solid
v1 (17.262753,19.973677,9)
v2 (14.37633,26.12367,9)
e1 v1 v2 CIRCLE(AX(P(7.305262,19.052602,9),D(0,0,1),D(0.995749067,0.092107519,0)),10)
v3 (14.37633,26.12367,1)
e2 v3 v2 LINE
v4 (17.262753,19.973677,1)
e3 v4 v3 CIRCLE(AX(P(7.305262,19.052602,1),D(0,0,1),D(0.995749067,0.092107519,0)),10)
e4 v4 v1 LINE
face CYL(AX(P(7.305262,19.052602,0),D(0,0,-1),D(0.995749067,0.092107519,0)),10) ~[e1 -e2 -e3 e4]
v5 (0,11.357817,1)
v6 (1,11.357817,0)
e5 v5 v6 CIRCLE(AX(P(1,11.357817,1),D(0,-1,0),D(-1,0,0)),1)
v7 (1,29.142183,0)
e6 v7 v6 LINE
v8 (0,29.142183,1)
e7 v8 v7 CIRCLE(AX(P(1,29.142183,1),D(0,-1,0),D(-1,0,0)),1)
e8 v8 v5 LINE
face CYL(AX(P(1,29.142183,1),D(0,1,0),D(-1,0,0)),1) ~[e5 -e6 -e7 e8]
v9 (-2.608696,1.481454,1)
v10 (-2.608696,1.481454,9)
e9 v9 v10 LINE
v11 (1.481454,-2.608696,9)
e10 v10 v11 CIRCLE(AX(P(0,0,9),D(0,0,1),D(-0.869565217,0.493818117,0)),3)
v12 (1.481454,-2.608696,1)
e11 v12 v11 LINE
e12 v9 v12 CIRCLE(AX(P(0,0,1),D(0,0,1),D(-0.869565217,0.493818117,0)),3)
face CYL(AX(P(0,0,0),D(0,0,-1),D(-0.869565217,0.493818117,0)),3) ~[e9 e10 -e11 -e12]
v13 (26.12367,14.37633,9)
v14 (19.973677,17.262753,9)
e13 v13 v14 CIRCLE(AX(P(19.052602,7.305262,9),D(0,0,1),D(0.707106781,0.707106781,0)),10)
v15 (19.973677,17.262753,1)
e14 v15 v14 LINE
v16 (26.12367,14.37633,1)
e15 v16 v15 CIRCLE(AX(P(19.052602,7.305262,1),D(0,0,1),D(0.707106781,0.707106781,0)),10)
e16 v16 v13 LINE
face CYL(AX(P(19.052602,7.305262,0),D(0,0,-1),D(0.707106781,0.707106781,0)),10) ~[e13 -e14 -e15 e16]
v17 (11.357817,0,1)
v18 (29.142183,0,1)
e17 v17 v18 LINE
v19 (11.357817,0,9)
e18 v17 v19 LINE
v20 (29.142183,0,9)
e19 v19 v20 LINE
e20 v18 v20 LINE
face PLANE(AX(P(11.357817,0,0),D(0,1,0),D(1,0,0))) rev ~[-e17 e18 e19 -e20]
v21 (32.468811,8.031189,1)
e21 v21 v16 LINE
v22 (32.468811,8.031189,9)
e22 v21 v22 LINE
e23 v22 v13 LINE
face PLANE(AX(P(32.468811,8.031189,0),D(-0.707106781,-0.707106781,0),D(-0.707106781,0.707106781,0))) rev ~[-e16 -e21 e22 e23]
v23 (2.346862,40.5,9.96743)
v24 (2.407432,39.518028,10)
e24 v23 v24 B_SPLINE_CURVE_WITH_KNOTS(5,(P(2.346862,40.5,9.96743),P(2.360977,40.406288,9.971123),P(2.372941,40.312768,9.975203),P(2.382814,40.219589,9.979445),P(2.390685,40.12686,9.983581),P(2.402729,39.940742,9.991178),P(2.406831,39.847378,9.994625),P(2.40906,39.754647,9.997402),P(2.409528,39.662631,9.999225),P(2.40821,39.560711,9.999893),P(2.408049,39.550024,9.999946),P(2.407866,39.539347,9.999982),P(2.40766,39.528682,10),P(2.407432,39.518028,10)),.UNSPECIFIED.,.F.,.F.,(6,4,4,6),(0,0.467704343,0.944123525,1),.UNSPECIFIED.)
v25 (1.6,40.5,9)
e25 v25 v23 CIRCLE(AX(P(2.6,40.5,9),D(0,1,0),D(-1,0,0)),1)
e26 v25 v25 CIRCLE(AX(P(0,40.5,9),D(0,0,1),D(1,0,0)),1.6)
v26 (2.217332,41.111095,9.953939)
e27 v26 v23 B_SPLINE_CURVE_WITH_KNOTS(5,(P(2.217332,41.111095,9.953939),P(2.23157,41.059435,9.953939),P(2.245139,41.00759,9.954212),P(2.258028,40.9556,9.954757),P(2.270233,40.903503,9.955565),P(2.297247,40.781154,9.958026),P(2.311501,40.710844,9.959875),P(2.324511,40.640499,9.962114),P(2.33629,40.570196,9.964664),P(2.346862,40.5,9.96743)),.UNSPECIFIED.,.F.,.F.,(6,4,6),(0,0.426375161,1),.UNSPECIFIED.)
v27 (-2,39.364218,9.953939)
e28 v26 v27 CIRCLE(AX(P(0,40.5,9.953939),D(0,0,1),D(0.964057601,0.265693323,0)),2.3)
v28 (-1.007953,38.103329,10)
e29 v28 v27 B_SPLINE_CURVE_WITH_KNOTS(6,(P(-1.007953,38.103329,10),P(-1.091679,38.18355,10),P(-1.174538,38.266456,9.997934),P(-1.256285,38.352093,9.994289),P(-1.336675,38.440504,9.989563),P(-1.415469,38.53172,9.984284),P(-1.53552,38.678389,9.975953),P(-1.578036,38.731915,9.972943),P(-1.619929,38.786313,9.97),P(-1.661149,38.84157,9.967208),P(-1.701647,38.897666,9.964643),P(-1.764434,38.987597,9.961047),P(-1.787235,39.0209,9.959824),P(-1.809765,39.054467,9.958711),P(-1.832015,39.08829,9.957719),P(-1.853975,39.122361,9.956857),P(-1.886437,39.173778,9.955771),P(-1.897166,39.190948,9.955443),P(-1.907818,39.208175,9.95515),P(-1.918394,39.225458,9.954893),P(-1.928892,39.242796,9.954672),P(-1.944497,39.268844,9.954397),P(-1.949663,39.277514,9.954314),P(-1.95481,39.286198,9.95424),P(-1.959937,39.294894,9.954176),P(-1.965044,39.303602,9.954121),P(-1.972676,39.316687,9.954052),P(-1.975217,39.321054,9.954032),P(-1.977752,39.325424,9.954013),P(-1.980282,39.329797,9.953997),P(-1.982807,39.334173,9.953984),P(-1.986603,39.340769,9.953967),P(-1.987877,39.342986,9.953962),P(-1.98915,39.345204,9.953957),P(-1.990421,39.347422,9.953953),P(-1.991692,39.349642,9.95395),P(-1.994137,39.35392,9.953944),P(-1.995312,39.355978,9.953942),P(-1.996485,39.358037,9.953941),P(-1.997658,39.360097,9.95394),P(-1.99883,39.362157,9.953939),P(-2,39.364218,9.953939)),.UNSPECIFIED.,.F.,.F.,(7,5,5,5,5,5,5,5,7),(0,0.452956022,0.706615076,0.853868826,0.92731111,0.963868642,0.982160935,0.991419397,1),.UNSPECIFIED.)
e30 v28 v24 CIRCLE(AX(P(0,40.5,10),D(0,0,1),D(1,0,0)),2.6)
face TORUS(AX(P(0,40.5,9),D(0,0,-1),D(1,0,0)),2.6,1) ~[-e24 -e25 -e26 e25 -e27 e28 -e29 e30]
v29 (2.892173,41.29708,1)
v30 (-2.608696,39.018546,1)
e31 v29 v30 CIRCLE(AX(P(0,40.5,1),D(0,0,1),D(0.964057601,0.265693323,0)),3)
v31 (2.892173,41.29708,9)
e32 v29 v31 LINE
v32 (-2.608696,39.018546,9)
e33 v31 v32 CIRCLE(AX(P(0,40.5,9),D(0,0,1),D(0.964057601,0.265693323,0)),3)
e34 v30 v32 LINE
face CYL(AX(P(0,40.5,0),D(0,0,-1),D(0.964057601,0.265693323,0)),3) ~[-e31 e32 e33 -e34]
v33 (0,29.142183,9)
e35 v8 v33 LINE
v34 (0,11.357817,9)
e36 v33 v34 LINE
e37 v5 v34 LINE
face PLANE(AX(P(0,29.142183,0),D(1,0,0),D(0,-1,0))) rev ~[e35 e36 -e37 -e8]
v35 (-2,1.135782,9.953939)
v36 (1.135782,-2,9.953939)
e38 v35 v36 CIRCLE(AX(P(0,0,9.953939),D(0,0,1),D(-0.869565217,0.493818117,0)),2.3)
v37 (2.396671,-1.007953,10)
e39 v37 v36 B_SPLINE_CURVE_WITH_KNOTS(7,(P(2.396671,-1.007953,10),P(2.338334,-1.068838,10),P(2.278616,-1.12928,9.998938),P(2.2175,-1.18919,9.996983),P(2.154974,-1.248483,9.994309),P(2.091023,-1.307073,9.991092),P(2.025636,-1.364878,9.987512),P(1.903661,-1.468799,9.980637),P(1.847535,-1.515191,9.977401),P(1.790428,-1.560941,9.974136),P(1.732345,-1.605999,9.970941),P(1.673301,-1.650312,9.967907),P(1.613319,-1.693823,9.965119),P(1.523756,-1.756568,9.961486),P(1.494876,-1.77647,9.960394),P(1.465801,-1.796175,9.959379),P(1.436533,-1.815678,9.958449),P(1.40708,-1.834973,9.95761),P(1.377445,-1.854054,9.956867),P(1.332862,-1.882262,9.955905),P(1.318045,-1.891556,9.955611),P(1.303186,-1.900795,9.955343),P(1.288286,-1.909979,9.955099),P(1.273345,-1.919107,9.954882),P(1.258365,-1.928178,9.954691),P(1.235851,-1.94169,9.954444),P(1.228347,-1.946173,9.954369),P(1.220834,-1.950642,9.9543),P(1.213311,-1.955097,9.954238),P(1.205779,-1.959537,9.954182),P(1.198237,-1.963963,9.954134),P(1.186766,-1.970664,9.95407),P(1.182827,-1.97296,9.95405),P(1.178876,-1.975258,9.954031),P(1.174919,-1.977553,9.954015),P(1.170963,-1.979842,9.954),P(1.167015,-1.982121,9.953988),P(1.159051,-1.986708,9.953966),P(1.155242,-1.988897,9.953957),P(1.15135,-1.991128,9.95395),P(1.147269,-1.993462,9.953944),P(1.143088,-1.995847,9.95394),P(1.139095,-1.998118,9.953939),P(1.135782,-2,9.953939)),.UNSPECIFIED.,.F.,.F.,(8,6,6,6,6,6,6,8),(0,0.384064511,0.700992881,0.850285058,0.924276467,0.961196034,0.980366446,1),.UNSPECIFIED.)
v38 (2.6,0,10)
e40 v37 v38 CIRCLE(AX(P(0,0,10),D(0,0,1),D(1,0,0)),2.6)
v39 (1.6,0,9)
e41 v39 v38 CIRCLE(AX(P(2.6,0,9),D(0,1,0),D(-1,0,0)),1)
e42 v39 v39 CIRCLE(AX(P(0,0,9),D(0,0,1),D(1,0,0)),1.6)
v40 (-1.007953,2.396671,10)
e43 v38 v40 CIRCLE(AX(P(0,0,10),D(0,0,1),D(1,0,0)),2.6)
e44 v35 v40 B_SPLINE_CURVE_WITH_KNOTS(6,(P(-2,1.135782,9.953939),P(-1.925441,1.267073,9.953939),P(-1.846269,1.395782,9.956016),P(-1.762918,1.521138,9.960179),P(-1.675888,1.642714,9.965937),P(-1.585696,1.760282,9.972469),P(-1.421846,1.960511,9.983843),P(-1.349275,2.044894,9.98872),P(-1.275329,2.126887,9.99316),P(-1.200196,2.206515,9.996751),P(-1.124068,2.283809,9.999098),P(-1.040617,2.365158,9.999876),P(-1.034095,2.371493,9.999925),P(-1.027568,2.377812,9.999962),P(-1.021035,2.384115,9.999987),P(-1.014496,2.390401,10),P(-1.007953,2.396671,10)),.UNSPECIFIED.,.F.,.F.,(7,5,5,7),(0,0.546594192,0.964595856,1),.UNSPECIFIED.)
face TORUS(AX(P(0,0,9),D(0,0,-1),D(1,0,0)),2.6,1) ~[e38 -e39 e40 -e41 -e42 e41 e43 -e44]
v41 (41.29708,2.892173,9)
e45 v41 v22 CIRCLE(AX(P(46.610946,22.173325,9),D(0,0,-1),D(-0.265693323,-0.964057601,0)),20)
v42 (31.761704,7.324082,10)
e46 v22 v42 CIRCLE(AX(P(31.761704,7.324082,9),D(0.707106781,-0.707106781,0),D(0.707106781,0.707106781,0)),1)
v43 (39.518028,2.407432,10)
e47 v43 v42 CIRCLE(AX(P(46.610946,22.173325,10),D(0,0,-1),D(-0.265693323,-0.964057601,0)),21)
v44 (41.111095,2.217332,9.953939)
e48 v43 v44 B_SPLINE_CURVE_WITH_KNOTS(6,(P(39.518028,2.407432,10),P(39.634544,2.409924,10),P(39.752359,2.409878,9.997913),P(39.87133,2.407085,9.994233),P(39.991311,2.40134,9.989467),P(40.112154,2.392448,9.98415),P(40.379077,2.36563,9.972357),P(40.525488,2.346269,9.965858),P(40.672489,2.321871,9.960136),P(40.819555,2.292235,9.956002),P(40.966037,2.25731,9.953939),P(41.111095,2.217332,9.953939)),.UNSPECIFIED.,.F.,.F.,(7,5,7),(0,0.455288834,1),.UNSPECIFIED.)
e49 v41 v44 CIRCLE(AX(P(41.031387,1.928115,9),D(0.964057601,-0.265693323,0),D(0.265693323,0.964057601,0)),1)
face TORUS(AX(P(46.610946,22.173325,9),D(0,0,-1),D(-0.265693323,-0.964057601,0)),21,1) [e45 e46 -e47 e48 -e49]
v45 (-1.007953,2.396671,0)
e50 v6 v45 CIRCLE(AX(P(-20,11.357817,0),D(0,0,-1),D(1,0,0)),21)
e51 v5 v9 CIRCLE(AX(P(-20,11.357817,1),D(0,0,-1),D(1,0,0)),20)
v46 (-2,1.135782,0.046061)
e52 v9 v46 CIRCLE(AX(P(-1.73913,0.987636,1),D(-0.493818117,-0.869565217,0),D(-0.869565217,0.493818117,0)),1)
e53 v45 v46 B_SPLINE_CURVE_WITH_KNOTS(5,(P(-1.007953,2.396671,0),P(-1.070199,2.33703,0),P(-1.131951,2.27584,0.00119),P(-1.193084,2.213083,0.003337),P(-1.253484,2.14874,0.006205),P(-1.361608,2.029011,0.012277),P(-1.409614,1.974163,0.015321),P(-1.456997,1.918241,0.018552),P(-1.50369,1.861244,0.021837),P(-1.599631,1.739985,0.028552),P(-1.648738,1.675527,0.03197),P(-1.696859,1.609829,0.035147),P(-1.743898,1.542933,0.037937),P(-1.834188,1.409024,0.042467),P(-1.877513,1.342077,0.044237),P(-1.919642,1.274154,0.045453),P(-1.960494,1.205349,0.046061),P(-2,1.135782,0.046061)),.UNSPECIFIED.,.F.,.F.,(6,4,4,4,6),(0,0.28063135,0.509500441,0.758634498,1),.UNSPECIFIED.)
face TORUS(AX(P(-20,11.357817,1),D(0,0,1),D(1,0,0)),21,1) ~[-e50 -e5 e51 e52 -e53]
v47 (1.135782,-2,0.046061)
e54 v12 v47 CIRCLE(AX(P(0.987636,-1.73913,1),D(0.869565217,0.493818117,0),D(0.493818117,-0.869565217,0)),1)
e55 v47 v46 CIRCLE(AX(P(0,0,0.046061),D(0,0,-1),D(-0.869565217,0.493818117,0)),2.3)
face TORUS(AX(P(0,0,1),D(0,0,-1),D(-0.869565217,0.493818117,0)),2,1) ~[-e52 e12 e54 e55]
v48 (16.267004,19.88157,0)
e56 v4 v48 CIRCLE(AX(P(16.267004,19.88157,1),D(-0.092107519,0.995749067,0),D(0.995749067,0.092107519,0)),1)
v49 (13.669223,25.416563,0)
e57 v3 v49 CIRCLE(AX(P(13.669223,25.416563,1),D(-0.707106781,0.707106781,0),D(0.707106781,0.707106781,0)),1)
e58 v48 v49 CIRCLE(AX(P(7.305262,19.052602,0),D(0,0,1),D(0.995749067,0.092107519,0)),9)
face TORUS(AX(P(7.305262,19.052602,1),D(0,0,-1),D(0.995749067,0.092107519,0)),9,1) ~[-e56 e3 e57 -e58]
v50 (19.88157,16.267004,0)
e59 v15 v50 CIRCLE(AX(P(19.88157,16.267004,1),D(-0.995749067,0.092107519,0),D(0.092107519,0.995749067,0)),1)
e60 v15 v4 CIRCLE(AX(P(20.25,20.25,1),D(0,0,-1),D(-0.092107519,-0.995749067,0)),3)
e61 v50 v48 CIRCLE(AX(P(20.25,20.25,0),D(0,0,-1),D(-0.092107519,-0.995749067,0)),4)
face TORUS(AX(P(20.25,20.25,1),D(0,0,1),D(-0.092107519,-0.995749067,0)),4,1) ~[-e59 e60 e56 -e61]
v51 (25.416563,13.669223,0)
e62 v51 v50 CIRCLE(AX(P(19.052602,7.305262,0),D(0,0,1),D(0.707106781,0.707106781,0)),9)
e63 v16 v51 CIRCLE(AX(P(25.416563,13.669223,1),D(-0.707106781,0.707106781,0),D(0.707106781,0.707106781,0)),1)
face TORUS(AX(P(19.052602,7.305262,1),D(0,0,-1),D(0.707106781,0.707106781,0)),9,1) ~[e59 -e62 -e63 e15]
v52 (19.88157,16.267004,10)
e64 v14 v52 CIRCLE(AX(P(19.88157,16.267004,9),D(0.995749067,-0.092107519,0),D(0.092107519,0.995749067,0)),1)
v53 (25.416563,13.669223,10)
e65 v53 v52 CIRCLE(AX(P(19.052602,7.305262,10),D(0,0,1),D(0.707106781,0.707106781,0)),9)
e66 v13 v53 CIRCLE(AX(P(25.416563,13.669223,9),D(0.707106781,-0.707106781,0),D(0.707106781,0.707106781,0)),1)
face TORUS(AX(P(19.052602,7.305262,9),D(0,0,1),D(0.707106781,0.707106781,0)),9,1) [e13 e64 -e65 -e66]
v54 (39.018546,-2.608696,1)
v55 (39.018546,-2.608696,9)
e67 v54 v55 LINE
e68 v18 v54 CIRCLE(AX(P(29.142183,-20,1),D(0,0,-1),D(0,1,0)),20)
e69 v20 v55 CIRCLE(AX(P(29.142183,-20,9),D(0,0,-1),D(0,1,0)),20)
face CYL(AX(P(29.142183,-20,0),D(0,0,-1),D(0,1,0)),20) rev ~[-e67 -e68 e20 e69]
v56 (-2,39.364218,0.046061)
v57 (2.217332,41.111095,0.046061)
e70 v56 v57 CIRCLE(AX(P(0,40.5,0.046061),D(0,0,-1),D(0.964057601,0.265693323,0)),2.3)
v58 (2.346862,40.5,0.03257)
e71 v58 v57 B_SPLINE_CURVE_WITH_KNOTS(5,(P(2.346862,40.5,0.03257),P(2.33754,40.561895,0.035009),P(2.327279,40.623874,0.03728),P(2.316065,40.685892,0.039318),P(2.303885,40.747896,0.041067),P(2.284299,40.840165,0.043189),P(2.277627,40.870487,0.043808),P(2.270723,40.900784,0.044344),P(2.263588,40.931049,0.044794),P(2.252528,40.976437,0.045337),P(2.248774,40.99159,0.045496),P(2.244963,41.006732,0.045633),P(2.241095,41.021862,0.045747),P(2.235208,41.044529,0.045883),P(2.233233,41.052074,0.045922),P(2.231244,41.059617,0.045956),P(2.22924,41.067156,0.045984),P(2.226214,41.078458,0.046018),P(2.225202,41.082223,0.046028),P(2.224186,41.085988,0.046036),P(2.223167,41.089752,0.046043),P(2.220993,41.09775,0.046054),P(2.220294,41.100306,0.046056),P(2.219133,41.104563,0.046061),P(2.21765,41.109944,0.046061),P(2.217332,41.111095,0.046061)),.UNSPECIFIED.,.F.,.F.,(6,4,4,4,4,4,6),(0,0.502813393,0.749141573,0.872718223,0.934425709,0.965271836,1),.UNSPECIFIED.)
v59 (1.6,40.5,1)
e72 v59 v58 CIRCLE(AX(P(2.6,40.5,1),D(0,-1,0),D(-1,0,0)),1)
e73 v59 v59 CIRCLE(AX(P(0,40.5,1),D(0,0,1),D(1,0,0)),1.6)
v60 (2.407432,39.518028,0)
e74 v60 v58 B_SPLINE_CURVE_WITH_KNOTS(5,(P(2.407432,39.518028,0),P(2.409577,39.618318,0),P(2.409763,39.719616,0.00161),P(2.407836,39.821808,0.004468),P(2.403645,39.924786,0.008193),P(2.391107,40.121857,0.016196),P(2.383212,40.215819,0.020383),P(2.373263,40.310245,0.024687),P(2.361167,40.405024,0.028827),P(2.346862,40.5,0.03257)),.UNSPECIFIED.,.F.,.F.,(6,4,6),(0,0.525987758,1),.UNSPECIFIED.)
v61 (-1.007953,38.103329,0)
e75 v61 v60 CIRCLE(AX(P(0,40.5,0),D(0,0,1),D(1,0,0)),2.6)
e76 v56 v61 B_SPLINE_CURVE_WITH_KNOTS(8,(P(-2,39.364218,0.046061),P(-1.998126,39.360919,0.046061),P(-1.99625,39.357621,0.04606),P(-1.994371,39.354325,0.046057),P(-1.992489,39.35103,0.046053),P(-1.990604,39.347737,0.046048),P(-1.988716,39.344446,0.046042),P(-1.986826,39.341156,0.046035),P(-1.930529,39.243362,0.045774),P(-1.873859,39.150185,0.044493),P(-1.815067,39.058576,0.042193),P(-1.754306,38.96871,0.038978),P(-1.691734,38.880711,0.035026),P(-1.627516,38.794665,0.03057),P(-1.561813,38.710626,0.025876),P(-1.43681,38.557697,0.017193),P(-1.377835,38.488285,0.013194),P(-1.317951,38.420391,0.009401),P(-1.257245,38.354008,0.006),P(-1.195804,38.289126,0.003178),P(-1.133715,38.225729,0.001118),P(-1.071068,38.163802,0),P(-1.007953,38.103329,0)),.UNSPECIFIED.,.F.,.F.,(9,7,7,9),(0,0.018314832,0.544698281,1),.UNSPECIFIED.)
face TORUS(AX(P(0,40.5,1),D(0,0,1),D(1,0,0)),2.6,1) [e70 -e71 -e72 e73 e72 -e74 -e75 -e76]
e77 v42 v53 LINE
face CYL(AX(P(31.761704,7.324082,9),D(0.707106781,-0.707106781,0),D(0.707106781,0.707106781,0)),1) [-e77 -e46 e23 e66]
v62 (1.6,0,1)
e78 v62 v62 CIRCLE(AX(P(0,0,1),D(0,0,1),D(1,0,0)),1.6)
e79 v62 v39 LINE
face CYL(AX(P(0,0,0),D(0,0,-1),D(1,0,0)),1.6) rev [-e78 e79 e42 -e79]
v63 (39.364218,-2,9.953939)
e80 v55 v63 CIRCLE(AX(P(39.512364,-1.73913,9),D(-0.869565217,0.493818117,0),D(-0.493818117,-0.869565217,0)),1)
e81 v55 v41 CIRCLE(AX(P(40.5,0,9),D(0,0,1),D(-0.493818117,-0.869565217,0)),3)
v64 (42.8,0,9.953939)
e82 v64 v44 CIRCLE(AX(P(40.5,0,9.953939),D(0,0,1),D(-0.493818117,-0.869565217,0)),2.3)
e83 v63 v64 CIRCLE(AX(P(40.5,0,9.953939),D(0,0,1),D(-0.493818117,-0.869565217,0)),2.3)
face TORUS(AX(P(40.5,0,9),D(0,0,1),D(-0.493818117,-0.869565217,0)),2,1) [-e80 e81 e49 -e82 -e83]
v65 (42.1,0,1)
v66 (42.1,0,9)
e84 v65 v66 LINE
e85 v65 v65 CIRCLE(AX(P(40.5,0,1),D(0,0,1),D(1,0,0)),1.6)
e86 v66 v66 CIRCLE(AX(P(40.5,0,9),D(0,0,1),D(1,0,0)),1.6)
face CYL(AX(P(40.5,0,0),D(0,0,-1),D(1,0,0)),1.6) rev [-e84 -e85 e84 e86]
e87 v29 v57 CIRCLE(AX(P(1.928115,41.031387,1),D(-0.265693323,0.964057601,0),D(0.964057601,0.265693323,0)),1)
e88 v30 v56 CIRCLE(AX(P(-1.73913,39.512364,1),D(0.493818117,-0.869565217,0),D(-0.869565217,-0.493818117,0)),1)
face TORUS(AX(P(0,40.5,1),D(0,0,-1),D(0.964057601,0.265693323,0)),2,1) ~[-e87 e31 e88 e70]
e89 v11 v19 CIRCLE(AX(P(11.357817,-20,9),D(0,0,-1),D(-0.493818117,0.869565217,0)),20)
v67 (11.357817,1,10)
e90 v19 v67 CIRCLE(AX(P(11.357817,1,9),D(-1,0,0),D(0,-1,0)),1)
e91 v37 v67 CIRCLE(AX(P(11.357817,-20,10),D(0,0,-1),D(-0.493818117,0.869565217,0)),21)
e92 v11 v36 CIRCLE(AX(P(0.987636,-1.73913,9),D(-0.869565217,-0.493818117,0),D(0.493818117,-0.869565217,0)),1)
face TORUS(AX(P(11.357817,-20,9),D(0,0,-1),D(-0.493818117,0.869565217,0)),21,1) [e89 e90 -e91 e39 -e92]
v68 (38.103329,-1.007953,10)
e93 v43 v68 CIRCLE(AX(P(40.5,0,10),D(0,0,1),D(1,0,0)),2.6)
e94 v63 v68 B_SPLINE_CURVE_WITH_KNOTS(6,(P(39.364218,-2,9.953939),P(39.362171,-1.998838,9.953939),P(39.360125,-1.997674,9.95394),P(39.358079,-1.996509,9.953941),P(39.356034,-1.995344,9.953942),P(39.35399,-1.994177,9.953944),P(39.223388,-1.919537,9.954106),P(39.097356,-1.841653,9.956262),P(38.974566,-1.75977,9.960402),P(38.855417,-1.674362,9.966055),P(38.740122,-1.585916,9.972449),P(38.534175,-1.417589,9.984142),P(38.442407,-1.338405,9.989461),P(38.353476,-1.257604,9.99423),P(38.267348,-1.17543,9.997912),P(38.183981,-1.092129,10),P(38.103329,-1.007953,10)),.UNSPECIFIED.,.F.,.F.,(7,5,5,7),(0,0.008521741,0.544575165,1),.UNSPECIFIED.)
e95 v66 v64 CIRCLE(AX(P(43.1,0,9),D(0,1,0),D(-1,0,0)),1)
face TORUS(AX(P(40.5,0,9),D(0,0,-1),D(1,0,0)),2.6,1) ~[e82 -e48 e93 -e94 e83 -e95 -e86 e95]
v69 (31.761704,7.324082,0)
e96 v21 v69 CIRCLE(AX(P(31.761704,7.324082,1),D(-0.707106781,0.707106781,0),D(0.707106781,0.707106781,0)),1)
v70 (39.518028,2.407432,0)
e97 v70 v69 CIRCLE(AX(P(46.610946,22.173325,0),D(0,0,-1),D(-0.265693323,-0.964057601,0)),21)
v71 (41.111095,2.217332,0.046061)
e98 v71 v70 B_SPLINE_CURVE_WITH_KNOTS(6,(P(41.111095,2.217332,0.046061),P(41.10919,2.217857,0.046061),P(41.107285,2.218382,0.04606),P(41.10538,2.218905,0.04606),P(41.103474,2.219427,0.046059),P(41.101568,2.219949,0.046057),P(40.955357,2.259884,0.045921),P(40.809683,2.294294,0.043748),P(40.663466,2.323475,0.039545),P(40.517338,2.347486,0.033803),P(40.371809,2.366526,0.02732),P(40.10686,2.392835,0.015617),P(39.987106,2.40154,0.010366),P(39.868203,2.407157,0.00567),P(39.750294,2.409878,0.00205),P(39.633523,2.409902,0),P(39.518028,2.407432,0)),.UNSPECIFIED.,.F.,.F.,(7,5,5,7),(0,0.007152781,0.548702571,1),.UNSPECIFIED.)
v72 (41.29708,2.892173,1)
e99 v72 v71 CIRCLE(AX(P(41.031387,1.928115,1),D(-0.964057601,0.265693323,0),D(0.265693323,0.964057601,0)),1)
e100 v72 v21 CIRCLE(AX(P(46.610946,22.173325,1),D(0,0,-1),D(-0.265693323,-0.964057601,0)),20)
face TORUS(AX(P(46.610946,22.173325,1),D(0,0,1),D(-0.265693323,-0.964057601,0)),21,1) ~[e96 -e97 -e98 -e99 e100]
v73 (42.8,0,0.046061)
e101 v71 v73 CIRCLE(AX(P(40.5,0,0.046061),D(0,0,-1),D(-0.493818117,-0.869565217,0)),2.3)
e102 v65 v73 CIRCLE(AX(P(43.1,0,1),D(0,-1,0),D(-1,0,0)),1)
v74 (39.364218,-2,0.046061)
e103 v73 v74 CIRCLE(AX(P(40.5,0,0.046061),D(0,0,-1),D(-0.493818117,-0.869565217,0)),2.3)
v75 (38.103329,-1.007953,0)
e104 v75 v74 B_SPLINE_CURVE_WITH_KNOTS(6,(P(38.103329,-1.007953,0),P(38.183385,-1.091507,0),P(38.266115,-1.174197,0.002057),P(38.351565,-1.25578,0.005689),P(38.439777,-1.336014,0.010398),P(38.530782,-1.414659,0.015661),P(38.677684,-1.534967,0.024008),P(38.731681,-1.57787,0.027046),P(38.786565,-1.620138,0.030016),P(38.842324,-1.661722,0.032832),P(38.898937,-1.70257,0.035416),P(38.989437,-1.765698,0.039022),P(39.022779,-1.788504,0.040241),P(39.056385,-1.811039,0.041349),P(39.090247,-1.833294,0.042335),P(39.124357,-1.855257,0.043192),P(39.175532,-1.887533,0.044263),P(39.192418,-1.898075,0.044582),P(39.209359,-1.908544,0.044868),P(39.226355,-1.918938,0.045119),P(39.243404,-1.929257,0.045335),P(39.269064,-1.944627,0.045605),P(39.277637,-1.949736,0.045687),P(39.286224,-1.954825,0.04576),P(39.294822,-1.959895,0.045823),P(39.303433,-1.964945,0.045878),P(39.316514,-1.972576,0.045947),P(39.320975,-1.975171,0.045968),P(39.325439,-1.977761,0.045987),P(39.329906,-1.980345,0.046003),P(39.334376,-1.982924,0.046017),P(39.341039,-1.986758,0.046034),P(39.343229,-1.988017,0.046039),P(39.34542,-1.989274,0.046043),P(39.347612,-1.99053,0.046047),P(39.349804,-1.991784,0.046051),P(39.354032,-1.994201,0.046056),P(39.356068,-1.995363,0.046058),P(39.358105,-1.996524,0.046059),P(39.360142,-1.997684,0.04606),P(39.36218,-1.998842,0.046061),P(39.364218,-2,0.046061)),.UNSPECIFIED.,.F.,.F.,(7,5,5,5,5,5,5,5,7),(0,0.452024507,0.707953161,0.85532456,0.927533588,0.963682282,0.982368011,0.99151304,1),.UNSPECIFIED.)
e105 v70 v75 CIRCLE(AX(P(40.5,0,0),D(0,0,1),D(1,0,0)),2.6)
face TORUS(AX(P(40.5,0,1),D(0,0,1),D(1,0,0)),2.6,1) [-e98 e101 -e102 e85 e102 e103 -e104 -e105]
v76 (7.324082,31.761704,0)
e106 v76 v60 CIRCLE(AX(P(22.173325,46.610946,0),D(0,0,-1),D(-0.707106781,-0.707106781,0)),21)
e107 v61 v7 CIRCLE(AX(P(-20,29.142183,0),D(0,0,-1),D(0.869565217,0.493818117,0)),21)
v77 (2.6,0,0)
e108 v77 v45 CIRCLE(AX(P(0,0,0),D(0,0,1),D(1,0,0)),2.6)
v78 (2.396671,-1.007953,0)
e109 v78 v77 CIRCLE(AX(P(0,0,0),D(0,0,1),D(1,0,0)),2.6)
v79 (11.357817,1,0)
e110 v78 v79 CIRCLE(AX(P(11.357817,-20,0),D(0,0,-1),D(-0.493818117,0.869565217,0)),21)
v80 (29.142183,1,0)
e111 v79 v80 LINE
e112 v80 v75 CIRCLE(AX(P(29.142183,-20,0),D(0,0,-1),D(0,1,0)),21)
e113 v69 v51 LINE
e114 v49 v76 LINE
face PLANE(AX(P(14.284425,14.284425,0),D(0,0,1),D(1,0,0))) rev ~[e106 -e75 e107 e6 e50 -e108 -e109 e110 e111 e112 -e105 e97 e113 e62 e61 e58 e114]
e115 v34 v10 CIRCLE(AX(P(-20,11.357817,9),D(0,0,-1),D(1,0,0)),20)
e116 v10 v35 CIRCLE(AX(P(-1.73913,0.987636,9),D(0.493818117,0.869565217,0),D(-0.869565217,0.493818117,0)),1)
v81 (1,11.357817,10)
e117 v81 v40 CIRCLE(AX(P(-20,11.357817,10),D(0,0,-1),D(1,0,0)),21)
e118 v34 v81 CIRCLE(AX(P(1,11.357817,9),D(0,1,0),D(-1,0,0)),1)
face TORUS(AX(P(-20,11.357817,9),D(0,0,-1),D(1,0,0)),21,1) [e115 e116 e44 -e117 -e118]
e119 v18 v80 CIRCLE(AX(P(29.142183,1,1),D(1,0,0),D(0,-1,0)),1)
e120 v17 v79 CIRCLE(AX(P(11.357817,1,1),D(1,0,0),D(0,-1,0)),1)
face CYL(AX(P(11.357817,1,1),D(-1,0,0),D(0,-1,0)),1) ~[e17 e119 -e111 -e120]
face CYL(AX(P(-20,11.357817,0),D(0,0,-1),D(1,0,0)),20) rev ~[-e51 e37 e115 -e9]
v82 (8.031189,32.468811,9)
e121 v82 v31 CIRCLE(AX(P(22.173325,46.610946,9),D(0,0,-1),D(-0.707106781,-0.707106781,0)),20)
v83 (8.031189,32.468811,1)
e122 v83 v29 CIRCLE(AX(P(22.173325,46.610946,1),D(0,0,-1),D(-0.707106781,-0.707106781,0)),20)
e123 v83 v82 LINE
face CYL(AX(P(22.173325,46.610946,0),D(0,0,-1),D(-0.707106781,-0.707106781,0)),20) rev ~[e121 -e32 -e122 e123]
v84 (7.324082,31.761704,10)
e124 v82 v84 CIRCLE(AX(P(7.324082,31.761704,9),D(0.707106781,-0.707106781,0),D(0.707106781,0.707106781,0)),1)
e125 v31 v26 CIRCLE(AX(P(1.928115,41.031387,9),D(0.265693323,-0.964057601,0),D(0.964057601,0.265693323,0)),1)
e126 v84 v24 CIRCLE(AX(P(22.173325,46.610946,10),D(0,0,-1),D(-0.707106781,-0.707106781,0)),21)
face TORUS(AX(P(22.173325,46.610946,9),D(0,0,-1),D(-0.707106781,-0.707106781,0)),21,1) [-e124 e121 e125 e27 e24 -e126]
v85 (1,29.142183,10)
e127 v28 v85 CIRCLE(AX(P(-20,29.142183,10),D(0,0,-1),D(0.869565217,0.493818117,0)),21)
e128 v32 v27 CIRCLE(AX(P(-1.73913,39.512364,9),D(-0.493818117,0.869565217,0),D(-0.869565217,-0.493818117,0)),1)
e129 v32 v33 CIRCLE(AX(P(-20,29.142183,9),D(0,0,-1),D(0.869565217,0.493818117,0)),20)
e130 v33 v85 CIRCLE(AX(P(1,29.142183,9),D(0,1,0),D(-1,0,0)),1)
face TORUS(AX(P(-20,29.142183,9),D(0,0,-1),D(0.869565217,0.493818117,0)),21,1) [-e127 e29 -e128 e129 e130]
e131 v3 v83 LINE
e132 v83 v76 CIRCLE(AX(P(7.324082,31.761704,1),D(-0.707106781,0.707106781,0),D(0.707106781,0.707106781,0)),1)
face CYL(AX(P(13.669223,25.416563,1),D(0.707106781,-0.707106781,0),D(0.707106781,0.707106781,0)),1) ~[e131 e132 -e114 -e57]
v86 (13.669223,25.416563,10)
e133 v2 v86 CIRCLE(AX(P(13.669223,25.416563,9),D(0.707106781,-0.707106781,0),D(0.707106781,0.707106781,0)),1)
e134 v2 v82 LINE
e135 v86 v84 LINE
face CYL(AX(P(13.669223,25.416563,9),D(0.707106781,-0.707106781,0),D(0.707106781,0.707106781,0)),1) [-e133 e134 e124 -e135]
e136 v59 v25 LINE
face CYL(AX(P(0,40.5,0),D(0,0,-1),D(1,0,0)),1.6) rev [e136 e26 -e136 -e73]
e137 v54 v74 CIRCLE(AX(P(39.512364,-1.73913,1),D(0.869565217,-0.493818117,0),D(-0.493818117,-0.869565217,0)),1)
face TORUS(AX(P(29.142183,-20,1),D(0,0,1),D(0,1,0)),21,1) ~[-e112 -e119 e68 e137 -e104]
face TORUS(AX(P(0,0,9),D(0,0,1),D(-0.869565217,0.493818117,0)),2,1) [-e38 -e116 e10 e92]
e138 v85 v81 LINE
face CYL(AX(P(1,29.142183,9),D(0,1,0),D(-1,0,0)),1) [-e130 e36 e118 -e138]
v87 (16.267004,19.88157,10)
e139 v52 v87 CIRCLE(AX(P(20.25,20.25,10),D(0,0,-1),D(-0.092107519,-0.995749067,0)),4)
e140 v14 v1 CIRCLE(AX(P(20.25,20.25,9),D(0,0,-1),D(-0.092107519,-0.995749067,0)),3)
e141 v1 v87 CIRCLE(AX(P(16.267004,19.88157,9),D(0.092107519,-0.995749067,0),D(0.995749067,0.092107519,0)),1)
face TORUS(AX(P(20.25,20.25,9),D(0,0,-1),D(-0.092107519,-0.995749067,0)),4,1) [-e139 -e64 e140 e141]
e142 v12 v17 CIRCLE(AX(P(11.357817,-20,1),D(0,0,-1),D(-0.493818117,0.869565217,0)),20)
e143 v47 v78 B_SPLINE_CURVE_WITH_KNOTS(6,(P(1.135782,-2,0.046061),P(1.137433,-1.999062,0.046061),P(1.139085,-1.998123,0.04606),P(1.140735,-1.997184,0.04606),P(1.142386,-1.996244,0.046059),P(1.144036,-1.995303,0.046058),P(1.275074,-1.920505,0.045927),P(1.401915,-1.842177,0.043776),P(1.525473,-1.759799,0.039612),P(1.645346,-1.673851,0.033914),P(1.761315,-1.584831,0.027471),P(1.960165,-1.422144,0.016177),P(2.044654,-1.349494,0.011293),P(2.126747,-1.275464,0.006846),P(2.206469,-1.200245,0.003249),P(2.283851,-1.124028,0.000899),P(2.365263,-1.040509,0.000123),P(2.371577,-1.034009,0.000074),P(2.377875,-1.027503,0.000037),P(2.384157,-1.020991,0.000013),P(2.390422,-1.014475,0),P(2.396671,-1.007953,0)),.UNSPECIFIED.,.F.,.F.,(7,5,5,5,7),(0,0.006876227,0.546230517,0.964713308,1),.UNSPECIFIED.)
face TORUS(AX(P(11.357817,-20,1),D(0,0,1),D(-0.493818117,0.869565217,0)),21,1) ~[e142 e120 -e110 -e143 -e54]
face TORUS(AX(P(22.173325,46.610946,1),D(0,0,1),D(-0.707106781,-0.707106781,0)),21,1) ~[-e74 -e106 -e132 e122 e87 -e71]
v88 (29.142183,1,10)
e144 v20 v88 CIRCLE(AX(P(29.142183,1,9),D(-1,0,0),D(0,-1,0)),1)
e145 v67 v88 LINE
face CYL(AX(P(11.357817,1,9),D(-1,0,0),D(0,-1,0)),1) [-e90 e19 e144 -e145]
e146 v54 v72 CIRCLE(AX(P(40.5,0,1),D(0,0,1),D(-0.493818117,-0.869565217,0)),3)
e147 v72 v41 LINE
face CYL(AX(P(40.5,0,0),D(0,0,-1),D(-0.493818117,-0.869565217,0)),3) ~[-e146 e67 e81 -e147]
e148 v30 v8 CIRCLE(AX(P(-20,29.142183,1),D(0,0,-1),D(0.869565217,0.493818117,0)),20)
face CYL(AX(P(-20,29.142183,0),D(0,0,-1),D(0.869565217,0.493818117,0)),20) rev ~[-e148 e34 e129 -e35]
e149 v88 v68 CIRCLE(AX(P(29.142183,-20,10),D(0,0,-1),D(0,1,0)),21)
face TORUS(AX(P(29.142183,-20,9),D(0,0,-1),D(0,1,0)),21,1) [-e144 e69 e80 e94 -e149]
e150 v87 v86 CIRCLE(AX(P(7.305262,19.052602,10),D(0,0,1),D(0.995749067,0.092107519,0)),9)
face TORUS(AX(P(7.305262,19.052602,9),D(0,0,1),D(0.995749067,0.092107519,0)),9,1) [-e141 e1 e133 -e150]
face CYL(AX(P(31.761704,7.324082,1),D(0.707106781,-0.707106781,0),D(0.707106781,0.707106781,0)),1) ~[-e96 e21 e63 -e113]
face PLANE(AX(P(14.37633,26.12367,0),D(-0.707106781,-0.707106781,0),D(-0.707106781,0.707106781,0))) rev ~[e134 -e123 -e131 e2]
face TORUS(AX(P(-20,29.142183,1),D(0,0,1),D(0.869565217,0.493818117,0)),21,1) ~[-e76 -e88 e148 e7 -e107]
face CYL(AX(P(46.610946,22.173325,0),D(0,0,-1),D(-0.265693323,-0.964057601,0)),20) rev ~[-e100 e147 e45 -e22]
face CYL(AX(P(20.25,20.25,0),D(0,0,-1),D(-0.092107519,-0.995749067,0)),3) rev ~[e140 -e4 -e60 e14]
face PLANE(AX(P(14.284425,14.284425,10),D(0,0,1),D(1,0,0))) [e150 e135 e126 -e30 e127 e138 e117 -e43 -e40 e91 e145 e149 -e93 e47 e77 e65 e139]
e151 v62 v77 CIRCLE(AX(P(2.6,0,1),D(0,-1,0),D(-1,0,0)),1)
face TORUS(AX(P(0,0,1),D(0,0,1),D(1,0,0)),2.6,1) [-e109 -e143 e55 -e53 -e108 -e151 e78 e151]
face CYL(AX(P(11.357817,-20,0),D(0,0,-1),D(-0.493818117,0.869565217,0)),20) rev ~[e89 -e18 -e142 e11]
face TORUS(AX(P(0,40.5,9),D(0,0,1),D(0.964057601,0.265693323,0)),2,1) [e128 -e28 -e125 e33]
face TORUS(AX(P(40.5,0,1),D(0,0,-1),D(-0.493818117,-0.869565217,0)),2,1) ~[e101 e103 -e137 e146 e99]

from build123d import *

# Parameters (mm, degrees)
F0_R          = 1.6
F1_DEPTH      = 10
F2_T3_ANGLE   = 29.591845794
F2_T6_ANGLE   = 194.1836915879
F2_T9_ANGLE   = 29.591845794
F2_T12_DEPTH  = 17.7843666168
F2_T15_ANGLE  = 29.591845794
F2_T18_ANGLE  = 149.1836915879
F2_T21_ANGLE  = 29.591845794
F2_T24_DEPTH  = 17.7843666168
F2_T27_ANGLE  = 29.591845794
F2_T30_ANGLE  = 194.1836915879
F2_T33_ANGLE  = 29.591845794
F2_T36_DEPTH  = 8.9733840835
F2_T39_ANGLE  = 39.7151372318
F2_T42_ANGLE  = 79.4302744637
F2_T45_ANGLE  = 39.7151372318
F2_T48_DEPTH  = 8.9733840835
F2_T60_ANGLE  = 29.591845794
F2_T63_ANGLE  = 194.1836915879
F2_T66_ANGLE  = 29.591845794
F2_T69_DEPTH  = 17.7843666168
F2_T72_ANGLE  = 29.591845794
F2_T75_ANGLE  = 149.1836915879
F2_T78_ANGLE  = 29.591845794
F2_T81_DEPTH  = 17.7843666168
F2_T84_ANGLE  = 29.591845794
F2_T87_ANGLE  = 194.1836915879
F2_T90_ANGLE  = 29.591845794
F2_T93_DEPTH  = 8.9733840835
F2_T96_ANGLE  = 39.7151372318
F2_T99_ANGLE  = 79.4302744637
F2_T102_ANGLE = 39.7151372318
F2_T105_DEPTH = 8.9733840835


# Not quite as in the source:
# - a fillet or chamfer that OpenCascade refuses, or shapes differently, is made with other operations: its cross-section is extruded or revolved along the edge and cut away or added


with BuildPart() as f1:
    # F0 (on Top) → F1 (new body)
    with BuildSketch(Plane.XY):
        with BuildLine():
            Line((11.3578166916, 0), (29.1421833084, 0))
            ThreePointArc((29.1421833084, 0), (34.249722493, -0.6631687322), (39.0185456489, -2.6086956522))
            ThreePointArc((39.0185456489, -2.6086956522), (43.2716385975, -1.1480502971), (41.297079968, 2.8921728034))
            ThreePointArc((41.297079968, 2.8921728034), (36.5493174981, 4.8885447172), (32.4688107979, 8.0311892021))
            Line((32.4688107979, 8.0311892021), (26.1236700622, 14.3763299378))
            ThreePointArc((26.1236700622, 14.3763299378), (23.3013016609, 16.3578061506), (19.9736774424, 17.2627527983))
            ThreePointArc((19.9736774424, 17.2627527983), (18.1286796564, 18.1286796564), (17.2627527983, 19.9736774424))
            ThreePointArc((17.2627527983, 19.9736774424), (16.3578061506, 23.3013016609), (14.3763299378, 26.1236700622))
            Line((14.3763299378, 26.1236700622), (8.0311892021, 32.4688107979))
            ThreePointArc((8.0311892021, 32.4688107979), (4.8885447172, 36.5493174981), (2.8921728034, 41.297079968))
            ThreePointArc((2.8921728034, 41.297079968), (-1.1480502971, 43.2716385975), (-2.6086956522, 39.0185456489))
            ThreePointArc((-2.6086956522, 39.0185456489), (-0.6631687322, 34.249722493), (0, 29.1421833084))
            Line((0, 29.1421833084), (0, 11.3578166916))
            ThreePointArc((0, 11.3578166916), (-0.6631687322, 6.250277507), (-2.6086956522, 1.4814543511))
            ThreePointArc((-2.6086956522, 1.4814543511), (-2.1213203436, -2.1213203436), (1.4814543511, -2.6086956522))
            ThreePointArc((1.4814543511, -2.6086956522), (6.250277507, -0.6631687322), (11.3578166916, 0))
        make_face()
        Circle(F0_R, mode=Mode.SUBTRACT)
        with Locations((40.5, 0)):
            Circle(F0_R, mode=Mode.SUBTRACT)
        with Locations((0, 40.5)):
            Circle(F0_R, mode=Mode.SUBTRACT)
    extrude(amount=F1_DEPTH)

    # F2: fillet of radius 1 on 38 edges, made by hand


with BuildPart() as f2_tool1:
    # F2_s2 → F2_t3 (revolve)
    with BuildSketch(Plane(origin=(-12.2188107979, 12.2188107979, 0), x_dir=(0, 0, 1), z_dir=(0.7071067812, -0.7071067812, 0))):
        with BuildLine():
            ThreePointArc((9, -28.6378246381), (9.7071067812, -28.3449314192), (10, -27.6378246381))
            Line((10, -27.6378246381), (10, -28.6378246381))
            Line((10, -28.6378246381), (9, -28.6378246381))
        make_face()
    revolve(axis=Axis((22.1733248258, 46.6109464216, 10), (0, 0, -1)), revolution_arc=F2_T3_ANGLE)


with BuildPart() as f2_tool4:
    # F2_s5 → F2_t6 (revolve)
    with BuildSketch(Plane(origin=(-10.3738185255, 37.6409858605, 0), x_dir=(0, 0, 1), z_dir=(0.2656933227, -0.9640576011, 0))):
        with BuildLine():
            ThreePointArc((9, -13.7605795685), (9.7071067812, -13.4676863497), (10, -12.7605795685))
            Line((10, -12.7605795685), (10, -13.7605795685))
            Line((10, -13.7605795685), (9, -13.7605795685))
        make_face()
    revolve(axis=Axis((0, 40.5, 10), (0, 0, 1)), revolution_arc=F2_T6_ANGLE)


with BuildPart() as f2_tool7:
    # F2_s8 → F2_t9 (revolve)
    with BuildSketch(Plane(origin=(-17.3909858605, 30.6238185255, 0), x_dir=(0, 0, 1), z_dir=(-0.493818117, 0.8695652174, 0))):
        with BuildLine():
            ThreePointArc((9, 16.9996337396), (9.7071067812, 17.2925269584), (10, 17.9996337396))
            Line((10, 17.9996337396), (10, 16.9996337396))
            Line((10, 16.9996337396), (9, 16.9996337396))
        make_face()
    revolve(axis=Axis((-20, 29.1421833084, 10), (0, 0, -1)), revolution_arc=F2_T9_ANGLE)


with BuildPart() as f2_tool10:
    # F2_s11 → F2_t12 (new body)
    with BuildSketch(Plane.XZ.offset(-29.1421833084)):
        with BuildLine():
            ThreePointArc((0, 9), (0.2928932188, 9.7071067812), (1, 10))
            Line((1, 10), (0, 10))
            Line((0, 10), (0, 9))
        make_face()
    extrude(amount=F2_T12_DEPTH)


with BuildPart() as f2_tool13:
    # F2_s14 → F2_t15 (revolve)
    with BuildSketch(Plane.XZ.offset(-11.3578166916)):
        with BuildLine():
            ThreePointArc((0, 9), (0.2928932188, 9.7071067812), (1, 10))
            Line((1, 10), (0, 10))
            Line((0, 10), (0, 9))
        make_face()
    revolve(axis=Axis((-20, 11.3578166916, 10), (0, 0, -1)), revolution_arc=F2_T15_ANGLE)


with BuildPart() as f2_tool16:
    # F2_s17 → F2_t18 (revolve)
    with BuildSketch(Plane(origin=(0, 0, 0), x_dir=(0, 0, 1), z_dir=(0.493818117, 0.8695652174, 0))):
        with BuildLine():
            ThreePointArc((9, -3), (9.7071067812, -2.7071067812), (10, -2))
            Line((10, -2), (10, -3))
            Line((10, -3), (9, -3))
        make_face()
    revolve(axis=Axis((0, 0, 10), (0, 0, 1)), revolution_arc=F2_T18_ANGLE)


with BuildPart() as f2_tool19:
    # F2_s20 → F2_t21 (revolve)
    with BuildSketch(Plane(origin=(0, 0, 0), x_dir=(0, 0, 1), z_dir=(-0.8695652174, -0.493818117, 0))):
        with BuildLine():
            ThreePointArc((9, -3), (9.7071067812, -2.7071067812), (10, -2))
            Line((10, -2), (10, -3))
            Line((10, -3), (9, -3))
        make_face()
    revolve(axis=Axis((11.3578166916, -20, 10), (0, 0, -1)), revolution_arc=F2_T21_ANGLE)


with BuildPart() as f2_tool22:
    # F2_s23 → F2_t24 (new body)
    with BuildSketch(Plane.YZ.offset(11.3578166916)):
        with BuildLine():
            ThreePointArc((0, 9), (0.2928932188, 9.7071067812), (1, 10))
            Line((1, 10), (0, 10))
            Line((0, 10), (0, 9))
        make_face()
    extrude(amount=F2_T24_DEPTH)


with BuildPart() as f2_tool25:
    # F2_s26 → F2_t27 (revolve)
    with BuildSketch(Plane.YZ.offset(29.1421833084)):
        with BuildLine():
            ThreePointArc((0, 9), (0.2928932188, 9.7071067812), (1, 10))
            Line((1, 10), (0, 10))
            Line((0, 10), (0, 9))
        make_face()
    revolve(axis=Axis((29.1421833084, -20, 10), (0, 0, -1)), revolution_arc=F2_T27_ANGLE)


with BuildPart() as f2_tool28:
    # F2_s29 → F2_t30 (revolve)
    with BuildSketch(Plane(origin=(30.6238185255, -17.3909858605, 0), x_dir=(0, 0, 1), z_dir=(-0.8695652174, 0.493818117, 0))):
        with BuildLine():
            ThreePointArc((9, 16.9996337396), (9.7071067812, 17.2925269584), (10, 17.9996337396))
            Line((10, 17.9996337396), (10, 16.9996337396))
            Line((10, 16.9996337396), (9, 16.9996337396))
        make_face()
    revolve(axis=Axis((40.5, 0, 10), (0, 0, 1)), revolution_arc=F2_T30_ANGLE)


with BuildPart() as f2_tool31:
    # F2_s32 → F2_t33 (revolve)
    with BuildSketch(Plane(origin=(37.6409858605, -10.3738185255, 0), x_dir=(0, 0, 1), z_dir=(0.9640576011, -0.2656933227, 0))):
        with BuildLine():
            ThreePointArc((9, -13.7605795685), (9.7071067812, -13.4676863497), (10, -12.7605795685))
            Line((10, -12.7605795685), (10, -13.7605795685))
            Line((10, -13.7605795685), (9, -13.7605795685))
        make_face()
    revolve(axis=Axis((46.6109464216, 22.1733248258, 10), (0, 0, -1)), revolution_arc=F2_T33_ANGLE)


with BuildPart() as f2_tool34:
    # F2_s35 → F2_t36 (new body)
    with BuildSketch(Plane(origin=(12.2188107979, -12.2188107979, 0), x_dir=(0, 0, 1), z_dir=(-0.7071067812, 0.7071067812, 0))):
        with BuildLine():
            ThreePointArc((9, 28.6378246381), (9.7071067812, 28.3449314192), (10, 27.6378246381))
            Line((10, 27.6378246381), (10, 28.6378246381))
            Line((10, 28.6378246381), (9, 28.6378246381))
        make_face()
    extrude(amount=F2_T36_DEPTH)


with BuildPart() as f2_tool37:
    # F2_s38 → F2_t39 (revolve)
    with BuildSketch(Plane(origin=(5.8736700622, -5.8736700622, 0), x_dir=(0, 0, 1), z_dir=(0.7071067812, -0.7071067812, 0))):
        with BuildLine():
            ThreePointArc((9, -28.6378246381), (9.7071067812, -28.3449314192), (10, -27.6378246381))
            Line((10, -27.6378246381), (10, -28.6378246381))
            Line((10, -28.6378246381), (9, -28.6378246381))
        make_face()
    revolve(axis=Axis((19.0526022504, 7.3052621259, 10), (0, 0, 1)), revolution_arc=F2_T39_ANGLE)


with BuildPart() as f2_tool40:
    # F2_s41 → F2_t42 (revolve)
    with BuildSketch(Plane(origin=(18.2209546286, -1.6854516701, 0), x_dir=(0, 0, 1), z_dir=(0.9957490672, -0.0921075192, 0))):
        with BuildLine():
            ThreePointArc((9, -19.0290958754), (9.7071067812, -18.7362026566), (10, -18.0290958754))
            Line((10, -18.0290958754), (10, -19.0290958754))
            Line((10, -19.0290958754), (9, -19.0290958754))
        make_face()
    revolve(axis=Axis((20.25, 20.25, 10), (0, 0, -1)), revolution_arc=F2_T42_ANGLE)


with BuildPart() as f2_tool43:
    # F2_s44 → F2_t45 (revolve)
    with BuildSketch(Plane(origin=(-1.6854516701, 18.2209546286, 0), x_dir=(0, 0, 1), z_dir=(0.0921075192, -0.9957490672, 0))):
        with BuildLine():
            ThreePointArc((9, -19.0290958754), (9.7071067812, -18.7362026566), (10, -18.0290958754))
            Line((10, -18.0290958754), (10, -19.0290958754))
            Line((10, -19.0290958754), (9, -19.0290958754))
        make_face()
    revolve(axis=Axis((7.3052621259, 19.0526022504, 10), (0, 0, 1)), revolution_arc=F2_T45_ANGLE)


with BuildPart() as f2_tool46:
    # F2_s47 → F2_t48 (new body)
    with BuildSketch(Plane(origin=(-5.8736700622, 5.8736700622, 0), x_dir=(0, 0, 1), z_dir=(-0.7071067812, 0.7071067812, 0))):
        with BuildLine():
            ThreePointArc((9, 28.6378246381), (9.7071067812, 28.3449314192), (10, 27.6378246381))
            Line((10, 27.6378246381), (10, 28.6378246381))
            Line((10, 28.6378246381), (9, 28.6378246381))
        make_face()
    extrude(amount=F2_T48_DEPTH)


with BuildPart() as f2_tool49:
    # F2_s50 → F2_t51 (revolve)
    with BuildSketch(Plane.XZ):
        with BuildLine():
            ThreePointArc((1.6, 9), (1.8928932188, 9.7071067812), (2.6, 10))
            Line((2.6, 10), (1.6, 10))
            Line((1.6, 10), (1.6, 9))
        make_face()
    revolve(axis=Axis((0, 0, 10), (0, 0, 1)))


with BuildPart() as f2_tool52:
    # F2_s53 → F2_t54 (revolve)
    with BuildSketch(Plane.XZ):
        with BuildLine():
            ThreePointArc((42.1, 9), (42.3928932188, 9.7071067812), (43.1, 10))
            Line((43.1, 10), (42.1, 10))
            Line((42.1, 10), (42.1, 9))
        make_face()
    revolve(axis=Axis((40.5, 0, 10), (0, 0, 1)))


with BuildPart() as f2_tool55:
    # F2_s56 → F2_t57 (revolve)
    with BuildSketch(Plane.XZ.offset(-40.5)):
        with BuildLine():
            ThreePointArc((1.6, 9), (1.8928932188, 9.7071067812), (2.6, 10))
            Line((2.6, 10), (1.6, 10))
            Line((1.6, 10), (1.6, 9))
        make_face()
    revolve(axis=Axis((0, 40.5, 10), (0, 0, 1)))


with BuildPart() as f2_tool58:
    # F2_s59 → F2_t60 (revolve)
    with BuildSketch(Plane(origin=(-12.2188107979, 12.2188107979, 0), x_dir=(0, 0, 1), z_dir=(0.7071067812, -0.7071067812, 0))):
        with BuildLine():
            ThreePointArc((1, -28.6378246381), (0.2928932188, -28.3449314192), (0, -27.6378246381))
            Line((0, -27.6378246381), (0, -28.6378246381))
            Line((0, -28.6378246381), (1, -28.6378246381))
        make_face()
    revolve(axis=Axis((22.1733248258, 46.6109464216, 0), (0, 0, -1)), revolution_arc=F2_T60_ANGLE)


with BuildPart() as f2_tool61:
    # F2_s62 → F2_t63 (revolve)
    with BuildSketch(Plane(origin=(-10.3738185255, 37.6409858605, 0), x_dir=(0, 0, 1), z_dir=(0.2656933227, -0.9640576011, 0))):
        with BuildLine():
            ThreePointArc((1, -13.7605795685), (0.2928932188, -13.4676863497), (0, -12.7605795685))
            Line((0, -12.7605795685), (0, -13.7605795685))
            Line((0, -13.7605795685), (1, -13.7605795685))
        make_face()
    revolve(axis=Axis((0, 40.5, 0), (0, 0, 1)), revolution_arc=F2_T63_ANGLE)


with BuildPart() as f2_tool64:
    # F2_s65 → F2_t66 (revolve)
    with BuildSketch(Plane(origin=(-17.3909858605, 30.6238185255, 0), x_dir=(0, 0, 1), z_dir=(-0.493818117, 0.8695652174, 0))):
        with BuildLine():
            ThreePointArc((1, 16.9996337396), (0.2928932188, 17.2925269584), (0, 17.9996337396))
            Line((0, 17.9996337396), (0, 16.9996337396))
            Line((0, 16.9996337396), (1, 16.9996337396))
        make_face()
    revolve(axis=Axis((-20, 29.1421833084, 0), (0, 0, -1)), revolution_arc=F2_T66_ANGLE)


with BuildPart() as f2_tool67:
    # F2_s68 → F2_t69 (new body)
    with BuildSketch(Plane.XZ.offset(-29.1421833084)):
        with BuildLine():
            ThreePointArc((0, 1), (0.2928932188, 0.2928932188), (1, 0))
            Line((1, 0), (0, 0))
            Line((0, 0), (0, 1))
        make_face()
    extrude(amount=F2_T69_DEPTH)


with BuildPart() as f2_tool70:
    # F2_s71 → F2_t72 (revolve)
    with BuildSketch(Plane.XZ.offset(-11.3578166916)):
        with BuildLine():
            ThreePointArc((0, 1), (0.2928932188, 0.2928932188), (1, 0))
            Line((1, 0), (0, 0))
            Line((0, 0), (0, 1))
        make_face()
    revolve(axis=Axis((-20, 11.3578166916, 0), (0, 0, -1)), revolution_arc=F2_T72_ANGLE)


with BuildPart() as f2_tool73:
    # F2_s74 → F2_t75 (revolve)
    with BuildSketch(Plane(origin=(0, 0, 0), x_dir=(0, 0, 1), z_dir=(0.493818117, 0.8695652174, 0))):
        with BuildLine():
            ThreePointArc((1, -3), (0.2928932188, -2.7071067812), (0, -2))
            Line((0, -2), (0, -3))
            Line((0, -3), (1, -3))
        make_face()
    revolve(axis=Axis((0, 0, 0), (0, 0, 1)), revolution_arc=F2_T75_ANGLE)


with BuildPart() as f2_tool76:
    # F2_s77 → F2_t78 (revolve)
    with BuildSketch(Plane(origin=(0, 0, 0), x_dir=(0, 0, 1), z_dir=(-0.8695652174, -0.493818117, 0))):
        with BuildLine():
            ThreePointArc((1, -3), (0.2928932188, -2.7071067812), (0, -2))
            Line((0, -2), (0, -3))
            Line((0, -3), (1, -3))
        make_face()
    revolve(axis=Axis((11.3578166916, -20, 0), (0, 0, -1)), revolution_arc=F2_T78_ANGLE)


with BuildPart() as f2_tool79:
    # F2_s80 → F2_t81 (new body)
    with BuildSketch(Plane.YZ.offset(11.3578166916)):
        with BuildLine():
            ThreePointArc((0, 1), (0.2928932188, 0.2928932188), (1, 0))
            Line((1, 0), (0, 0))
            Line((0, 0), (0, 1))
        make_face()
    extrude(amount=F2_T81_DEPTH)


with BuildPart() as f2_tool82:
    # F2_s83 → F2_t84 (revolve)
    with BuildSketch(Plane.YZ.offset(29.1421833084)):
        with BuildLine():
            ThreePointArc((0, 1), (0.2928932188, 0.2928932188), (1, 0))
            Line((1, 0), (0, 0))
            Line((0, 0), (0, 1))
        make_face()
    revolve(axis=Axis((29.1421833084, -20, 0), (0, 0, -1)), revolution_arc=F2_T84_ANGLE)


with BuildPart() as f2_tool85:
    # F2_s86 → F2_t87 (revolve)
    with BuildSketch(Plane(origin=(30.6238185255, -17.3909858605, 0), x_dir=(0, 0, 1), z_dir=(-0.8695652174, 0.493818117, 0))):
        with BuildLine():
            ThreePointArc((1, 16.9996337396), (0.2928932188, 17.2925269584), (0, 17.9996337396))
            Line((0, 17.9996337396), (0, 16.9996337396))
            Line((0, 16.9996337396), (1, 16.9996337396))
        make_face()
    revolve(axis=Axis((40.5, 0, 0), (0, 0, 1)), revolution_arc=F2_T87_ANGLE)


with BuildPart() as f2_tool88:
    # F2_s89 → F2_t90 (revolve)
    with BuildSketch(Plane(origin=(37.6409858605, -10.3738185255, 0), x_dir=(0, 0, 1), z_dir=(0.9640576011, -0.2656933227, 0))):
        with BuildLine():
            ThreePointArc((1, -13.7605795685), (0.2928932188, -13.4676863497), (0, -12.7605795685))
            Line((0, -12.7605795685), (0, -13.7605795685))
            Line((0, -13.7605795685), (1, -13.7605795685))
        make_face()
    revolve(axis=Axis((46.6109464216, 22.1733248258, 0), (0, 0, -1)), revolution_arc=F2_T90_ANGLE)


with BuildPart() as f2_tool91:
    # F2_s92 → F2_t93 (new body)
    with BuildSketch(Plane(origin=(12.2188107979, -12.2188107979, 0), x_dir=(0, 0, 1), z_dir=(-0.7071067812, 0.7071067812, 0))):
        with BuildLine():
            ThreePointArc((1, 28.6378246381), (0.2928932188, 28.3449314192), (0, 27.6378246381))
            Line((0, 27.6378246381), (0, 28.6378246381))
            Line((0, 28.6378246381), (1, 28.6378246381))
        make_face()
    extrude(amount=F2_T93_DEPTH)


with BuildPart() as f2_tool94:
    # F2_s95 → F2_t96 (revolve)
    with BuildSketch(Plane(origin=(5.8736700622, -5.8736700622, 0), x_dir=(0, 0, 1), z_dir=(0.7071067812, -0.7071067812, 0))):
        with BuildLine():
            ThreePointArc((1, -28.6378246381), (0.2928932188, -28.3449314192), (0, -27.6378246381))
            Line((0, -27.6378246381), (0, -28.6378246381))
            Line((0, -28.6378246381), (1, -28.6378246381))
        make_face()
    revolve(axis=Axis((19.0526022504, 7.3052621259, 0), (0, 0, 1)), revolution_arc=F2_T96_ANGLE)


with BuildPart() as f2_tool97:
    # F2_s98 → F2_t99 (revolve)
    with BuildSketch(Plane(origin=(18.2209546286, -1.6854516701, 0), x_dir=(0, 0, 1), z_dir=(0.9957490672, -0.0921075192, 0))):
        with BuildLine():
            ThreePointArc((1, -19.0290958754), (0.2928932188, -18.7362026566), (0, -18.0290958754))
            Line((0, -18.0290958754), (0, -19.0290958754))
            Line((0, -19.0290958754), (1, -19.0290958754))
        make_face()
    revolve(axis=Axis((20.25, 20.25, 0), (0, 0, -1)), revolution_arc=F2_T99_ANGLE)


with BuildPart() as f2_tool100:
    # F2_s101 → F2_t102 (revolve)
    with BuildSketch(Plane(origin=(-1.6854516701, 18.2209546286, 0), x_dir=(0, 0, 1), z_dir=(0.0921075192, -0.9957490672, 0))):
        with BuildLine():
            ThreePointArc((1, -19.0290958754), (0.2928932188, -18.7362026566), (0, -18.0290958754))
            Line((0, -18.0290958754), (0, -19.0290958754))
            Line((0, -19.0290958754), (1, -19.0290958754))
        make_face()
    revolve(axis=Axis((7.3052621259, 19.0526022504, 0), (0, 0, 1)), revolution_arc=F2_T102_ANGLE)


with BuildPart() as f2_tool103:
    # F2_s104 → F2_t105 (new body)
    with BuildSketch(Plane(origin=(-5.8736700622, 5.8736700622, 0), x_dir=(0, 0, 1), z_dir=(-0.7071067812, 0.7071067812, 0))):
        with BuildLine():
            ThreePointArc((1, 28.6378246381), (0.2928932188, 28.3449314192), (0, 27.6378246381))
            Line((0, 27.6378246381), (0, 28.6378246381))
            Line((0, 28.6378246381), (1, 28.6378246381))
        make_face()
    extrude(amount=F2_T105_DEPTH)


with BuildPart() as f2_tool106:
    # F2_s107 → F2_t108 (revolve)
    with BuildSketch(Plane.XZ):
        with BuildLine():
            ThreePointArc((1.6, 1), (1.8928932188, 0.2928932188), (2.6, 0))
            Line((2.6, 0), (1.6, 0))
            Line((1.6, 0), (1.6, 1))
        make_face()
    revolve(axis=Axis((0, 0, 0), (0, 0, 1)))


with BuildPart() as f2_tool109:
    # F2_s110 → F2_t111 (revolve)
    with BuildSketch(Plane.XZ):
        with BuildLine():
            ThreePointArc((42.1, 1), (42.3928932188, 0.2928932188), (43.1, 0))
            Line((43.1, 0), (42.1, 0))
            Line((42.1, 0), (42.1, 1))
        make_face()
    revolve(axis=Axis((40.5, 0, 0), (0, 0, 1)))


with BuildPart() as f2_tool112:
    # F2_s113 → F2_t114 (revolve)
    with BuildSketch(Plane.XZ.offset(-40.5)):
        with BuildLine():
            ThreePointArc((1.6, 1), (1.8928932188, 0.2928932188), (2.6, 0))
            Line((2.6, 0), (1.6, 0))
            Line((1.6, 0), (1.6, 1))
        make_face()
    revolve(axis=Axis((0, 40.5, 0), (0, 0, 1)))


with BuildPart() as f1_1:
    add(f1.part)

    # F2_t115: cut F2_tool1, F2_tool4, F2_tool7, F2_tool10, F2_tool13, F2_tool16, F2_tool19, F2_tool22, F2_tool25, F2_tool28, F2_tool31, F2_tool34, F2_tool37, F2_tool40, F2_tool43, F2_tool46, F2_tool49, F2_tool52, F2_tool55, F2_tool58, F2_tool61, F2_tool64, F2_tool67, F2_tool70, F2_tool73, F2_tool76, F2_tool79, F2_tool82, F2_tool85, F2_tool88, F2_tool91, F2_tool94, F2_tool97, F2_tool100, F2_tool103, F2_tool106, F2_tool109, F2_tool112
    add([f2_tool1.part, f2_tool4.part, f2_tool7.part, f2_tool10.part, f2_tool13.part, f2_tool16.part, f2_tool19.part, f2_tool22.part, f2_tool25.part, f2_tool28.part, f2_tool31.part, f2_tool34.part, f2_tool37.part, f2_tool40.part, f2_tool43.part, f2_tool46.part, f2_tool49.part, f2_tool52.part, f2_tool55.part, f2_tool58.part, f2_tool61.part, f2_tool64.part, f2_tool67.part, f2_tool70.part, f2_tool73.part, f2_tool76.part, f2_tool79.part, f2_tool82.part, f2_tool85.part, f2_tool88.part, f2_tool91.part, f2_tool94.part, f2_tool97.part, f2_tool100.part, f2_tool103.part, f2_tool106.part, f2_tool109.part, f2_tool112.part], mode=Mode.SUBTRACT)


solid = f1_1.part
